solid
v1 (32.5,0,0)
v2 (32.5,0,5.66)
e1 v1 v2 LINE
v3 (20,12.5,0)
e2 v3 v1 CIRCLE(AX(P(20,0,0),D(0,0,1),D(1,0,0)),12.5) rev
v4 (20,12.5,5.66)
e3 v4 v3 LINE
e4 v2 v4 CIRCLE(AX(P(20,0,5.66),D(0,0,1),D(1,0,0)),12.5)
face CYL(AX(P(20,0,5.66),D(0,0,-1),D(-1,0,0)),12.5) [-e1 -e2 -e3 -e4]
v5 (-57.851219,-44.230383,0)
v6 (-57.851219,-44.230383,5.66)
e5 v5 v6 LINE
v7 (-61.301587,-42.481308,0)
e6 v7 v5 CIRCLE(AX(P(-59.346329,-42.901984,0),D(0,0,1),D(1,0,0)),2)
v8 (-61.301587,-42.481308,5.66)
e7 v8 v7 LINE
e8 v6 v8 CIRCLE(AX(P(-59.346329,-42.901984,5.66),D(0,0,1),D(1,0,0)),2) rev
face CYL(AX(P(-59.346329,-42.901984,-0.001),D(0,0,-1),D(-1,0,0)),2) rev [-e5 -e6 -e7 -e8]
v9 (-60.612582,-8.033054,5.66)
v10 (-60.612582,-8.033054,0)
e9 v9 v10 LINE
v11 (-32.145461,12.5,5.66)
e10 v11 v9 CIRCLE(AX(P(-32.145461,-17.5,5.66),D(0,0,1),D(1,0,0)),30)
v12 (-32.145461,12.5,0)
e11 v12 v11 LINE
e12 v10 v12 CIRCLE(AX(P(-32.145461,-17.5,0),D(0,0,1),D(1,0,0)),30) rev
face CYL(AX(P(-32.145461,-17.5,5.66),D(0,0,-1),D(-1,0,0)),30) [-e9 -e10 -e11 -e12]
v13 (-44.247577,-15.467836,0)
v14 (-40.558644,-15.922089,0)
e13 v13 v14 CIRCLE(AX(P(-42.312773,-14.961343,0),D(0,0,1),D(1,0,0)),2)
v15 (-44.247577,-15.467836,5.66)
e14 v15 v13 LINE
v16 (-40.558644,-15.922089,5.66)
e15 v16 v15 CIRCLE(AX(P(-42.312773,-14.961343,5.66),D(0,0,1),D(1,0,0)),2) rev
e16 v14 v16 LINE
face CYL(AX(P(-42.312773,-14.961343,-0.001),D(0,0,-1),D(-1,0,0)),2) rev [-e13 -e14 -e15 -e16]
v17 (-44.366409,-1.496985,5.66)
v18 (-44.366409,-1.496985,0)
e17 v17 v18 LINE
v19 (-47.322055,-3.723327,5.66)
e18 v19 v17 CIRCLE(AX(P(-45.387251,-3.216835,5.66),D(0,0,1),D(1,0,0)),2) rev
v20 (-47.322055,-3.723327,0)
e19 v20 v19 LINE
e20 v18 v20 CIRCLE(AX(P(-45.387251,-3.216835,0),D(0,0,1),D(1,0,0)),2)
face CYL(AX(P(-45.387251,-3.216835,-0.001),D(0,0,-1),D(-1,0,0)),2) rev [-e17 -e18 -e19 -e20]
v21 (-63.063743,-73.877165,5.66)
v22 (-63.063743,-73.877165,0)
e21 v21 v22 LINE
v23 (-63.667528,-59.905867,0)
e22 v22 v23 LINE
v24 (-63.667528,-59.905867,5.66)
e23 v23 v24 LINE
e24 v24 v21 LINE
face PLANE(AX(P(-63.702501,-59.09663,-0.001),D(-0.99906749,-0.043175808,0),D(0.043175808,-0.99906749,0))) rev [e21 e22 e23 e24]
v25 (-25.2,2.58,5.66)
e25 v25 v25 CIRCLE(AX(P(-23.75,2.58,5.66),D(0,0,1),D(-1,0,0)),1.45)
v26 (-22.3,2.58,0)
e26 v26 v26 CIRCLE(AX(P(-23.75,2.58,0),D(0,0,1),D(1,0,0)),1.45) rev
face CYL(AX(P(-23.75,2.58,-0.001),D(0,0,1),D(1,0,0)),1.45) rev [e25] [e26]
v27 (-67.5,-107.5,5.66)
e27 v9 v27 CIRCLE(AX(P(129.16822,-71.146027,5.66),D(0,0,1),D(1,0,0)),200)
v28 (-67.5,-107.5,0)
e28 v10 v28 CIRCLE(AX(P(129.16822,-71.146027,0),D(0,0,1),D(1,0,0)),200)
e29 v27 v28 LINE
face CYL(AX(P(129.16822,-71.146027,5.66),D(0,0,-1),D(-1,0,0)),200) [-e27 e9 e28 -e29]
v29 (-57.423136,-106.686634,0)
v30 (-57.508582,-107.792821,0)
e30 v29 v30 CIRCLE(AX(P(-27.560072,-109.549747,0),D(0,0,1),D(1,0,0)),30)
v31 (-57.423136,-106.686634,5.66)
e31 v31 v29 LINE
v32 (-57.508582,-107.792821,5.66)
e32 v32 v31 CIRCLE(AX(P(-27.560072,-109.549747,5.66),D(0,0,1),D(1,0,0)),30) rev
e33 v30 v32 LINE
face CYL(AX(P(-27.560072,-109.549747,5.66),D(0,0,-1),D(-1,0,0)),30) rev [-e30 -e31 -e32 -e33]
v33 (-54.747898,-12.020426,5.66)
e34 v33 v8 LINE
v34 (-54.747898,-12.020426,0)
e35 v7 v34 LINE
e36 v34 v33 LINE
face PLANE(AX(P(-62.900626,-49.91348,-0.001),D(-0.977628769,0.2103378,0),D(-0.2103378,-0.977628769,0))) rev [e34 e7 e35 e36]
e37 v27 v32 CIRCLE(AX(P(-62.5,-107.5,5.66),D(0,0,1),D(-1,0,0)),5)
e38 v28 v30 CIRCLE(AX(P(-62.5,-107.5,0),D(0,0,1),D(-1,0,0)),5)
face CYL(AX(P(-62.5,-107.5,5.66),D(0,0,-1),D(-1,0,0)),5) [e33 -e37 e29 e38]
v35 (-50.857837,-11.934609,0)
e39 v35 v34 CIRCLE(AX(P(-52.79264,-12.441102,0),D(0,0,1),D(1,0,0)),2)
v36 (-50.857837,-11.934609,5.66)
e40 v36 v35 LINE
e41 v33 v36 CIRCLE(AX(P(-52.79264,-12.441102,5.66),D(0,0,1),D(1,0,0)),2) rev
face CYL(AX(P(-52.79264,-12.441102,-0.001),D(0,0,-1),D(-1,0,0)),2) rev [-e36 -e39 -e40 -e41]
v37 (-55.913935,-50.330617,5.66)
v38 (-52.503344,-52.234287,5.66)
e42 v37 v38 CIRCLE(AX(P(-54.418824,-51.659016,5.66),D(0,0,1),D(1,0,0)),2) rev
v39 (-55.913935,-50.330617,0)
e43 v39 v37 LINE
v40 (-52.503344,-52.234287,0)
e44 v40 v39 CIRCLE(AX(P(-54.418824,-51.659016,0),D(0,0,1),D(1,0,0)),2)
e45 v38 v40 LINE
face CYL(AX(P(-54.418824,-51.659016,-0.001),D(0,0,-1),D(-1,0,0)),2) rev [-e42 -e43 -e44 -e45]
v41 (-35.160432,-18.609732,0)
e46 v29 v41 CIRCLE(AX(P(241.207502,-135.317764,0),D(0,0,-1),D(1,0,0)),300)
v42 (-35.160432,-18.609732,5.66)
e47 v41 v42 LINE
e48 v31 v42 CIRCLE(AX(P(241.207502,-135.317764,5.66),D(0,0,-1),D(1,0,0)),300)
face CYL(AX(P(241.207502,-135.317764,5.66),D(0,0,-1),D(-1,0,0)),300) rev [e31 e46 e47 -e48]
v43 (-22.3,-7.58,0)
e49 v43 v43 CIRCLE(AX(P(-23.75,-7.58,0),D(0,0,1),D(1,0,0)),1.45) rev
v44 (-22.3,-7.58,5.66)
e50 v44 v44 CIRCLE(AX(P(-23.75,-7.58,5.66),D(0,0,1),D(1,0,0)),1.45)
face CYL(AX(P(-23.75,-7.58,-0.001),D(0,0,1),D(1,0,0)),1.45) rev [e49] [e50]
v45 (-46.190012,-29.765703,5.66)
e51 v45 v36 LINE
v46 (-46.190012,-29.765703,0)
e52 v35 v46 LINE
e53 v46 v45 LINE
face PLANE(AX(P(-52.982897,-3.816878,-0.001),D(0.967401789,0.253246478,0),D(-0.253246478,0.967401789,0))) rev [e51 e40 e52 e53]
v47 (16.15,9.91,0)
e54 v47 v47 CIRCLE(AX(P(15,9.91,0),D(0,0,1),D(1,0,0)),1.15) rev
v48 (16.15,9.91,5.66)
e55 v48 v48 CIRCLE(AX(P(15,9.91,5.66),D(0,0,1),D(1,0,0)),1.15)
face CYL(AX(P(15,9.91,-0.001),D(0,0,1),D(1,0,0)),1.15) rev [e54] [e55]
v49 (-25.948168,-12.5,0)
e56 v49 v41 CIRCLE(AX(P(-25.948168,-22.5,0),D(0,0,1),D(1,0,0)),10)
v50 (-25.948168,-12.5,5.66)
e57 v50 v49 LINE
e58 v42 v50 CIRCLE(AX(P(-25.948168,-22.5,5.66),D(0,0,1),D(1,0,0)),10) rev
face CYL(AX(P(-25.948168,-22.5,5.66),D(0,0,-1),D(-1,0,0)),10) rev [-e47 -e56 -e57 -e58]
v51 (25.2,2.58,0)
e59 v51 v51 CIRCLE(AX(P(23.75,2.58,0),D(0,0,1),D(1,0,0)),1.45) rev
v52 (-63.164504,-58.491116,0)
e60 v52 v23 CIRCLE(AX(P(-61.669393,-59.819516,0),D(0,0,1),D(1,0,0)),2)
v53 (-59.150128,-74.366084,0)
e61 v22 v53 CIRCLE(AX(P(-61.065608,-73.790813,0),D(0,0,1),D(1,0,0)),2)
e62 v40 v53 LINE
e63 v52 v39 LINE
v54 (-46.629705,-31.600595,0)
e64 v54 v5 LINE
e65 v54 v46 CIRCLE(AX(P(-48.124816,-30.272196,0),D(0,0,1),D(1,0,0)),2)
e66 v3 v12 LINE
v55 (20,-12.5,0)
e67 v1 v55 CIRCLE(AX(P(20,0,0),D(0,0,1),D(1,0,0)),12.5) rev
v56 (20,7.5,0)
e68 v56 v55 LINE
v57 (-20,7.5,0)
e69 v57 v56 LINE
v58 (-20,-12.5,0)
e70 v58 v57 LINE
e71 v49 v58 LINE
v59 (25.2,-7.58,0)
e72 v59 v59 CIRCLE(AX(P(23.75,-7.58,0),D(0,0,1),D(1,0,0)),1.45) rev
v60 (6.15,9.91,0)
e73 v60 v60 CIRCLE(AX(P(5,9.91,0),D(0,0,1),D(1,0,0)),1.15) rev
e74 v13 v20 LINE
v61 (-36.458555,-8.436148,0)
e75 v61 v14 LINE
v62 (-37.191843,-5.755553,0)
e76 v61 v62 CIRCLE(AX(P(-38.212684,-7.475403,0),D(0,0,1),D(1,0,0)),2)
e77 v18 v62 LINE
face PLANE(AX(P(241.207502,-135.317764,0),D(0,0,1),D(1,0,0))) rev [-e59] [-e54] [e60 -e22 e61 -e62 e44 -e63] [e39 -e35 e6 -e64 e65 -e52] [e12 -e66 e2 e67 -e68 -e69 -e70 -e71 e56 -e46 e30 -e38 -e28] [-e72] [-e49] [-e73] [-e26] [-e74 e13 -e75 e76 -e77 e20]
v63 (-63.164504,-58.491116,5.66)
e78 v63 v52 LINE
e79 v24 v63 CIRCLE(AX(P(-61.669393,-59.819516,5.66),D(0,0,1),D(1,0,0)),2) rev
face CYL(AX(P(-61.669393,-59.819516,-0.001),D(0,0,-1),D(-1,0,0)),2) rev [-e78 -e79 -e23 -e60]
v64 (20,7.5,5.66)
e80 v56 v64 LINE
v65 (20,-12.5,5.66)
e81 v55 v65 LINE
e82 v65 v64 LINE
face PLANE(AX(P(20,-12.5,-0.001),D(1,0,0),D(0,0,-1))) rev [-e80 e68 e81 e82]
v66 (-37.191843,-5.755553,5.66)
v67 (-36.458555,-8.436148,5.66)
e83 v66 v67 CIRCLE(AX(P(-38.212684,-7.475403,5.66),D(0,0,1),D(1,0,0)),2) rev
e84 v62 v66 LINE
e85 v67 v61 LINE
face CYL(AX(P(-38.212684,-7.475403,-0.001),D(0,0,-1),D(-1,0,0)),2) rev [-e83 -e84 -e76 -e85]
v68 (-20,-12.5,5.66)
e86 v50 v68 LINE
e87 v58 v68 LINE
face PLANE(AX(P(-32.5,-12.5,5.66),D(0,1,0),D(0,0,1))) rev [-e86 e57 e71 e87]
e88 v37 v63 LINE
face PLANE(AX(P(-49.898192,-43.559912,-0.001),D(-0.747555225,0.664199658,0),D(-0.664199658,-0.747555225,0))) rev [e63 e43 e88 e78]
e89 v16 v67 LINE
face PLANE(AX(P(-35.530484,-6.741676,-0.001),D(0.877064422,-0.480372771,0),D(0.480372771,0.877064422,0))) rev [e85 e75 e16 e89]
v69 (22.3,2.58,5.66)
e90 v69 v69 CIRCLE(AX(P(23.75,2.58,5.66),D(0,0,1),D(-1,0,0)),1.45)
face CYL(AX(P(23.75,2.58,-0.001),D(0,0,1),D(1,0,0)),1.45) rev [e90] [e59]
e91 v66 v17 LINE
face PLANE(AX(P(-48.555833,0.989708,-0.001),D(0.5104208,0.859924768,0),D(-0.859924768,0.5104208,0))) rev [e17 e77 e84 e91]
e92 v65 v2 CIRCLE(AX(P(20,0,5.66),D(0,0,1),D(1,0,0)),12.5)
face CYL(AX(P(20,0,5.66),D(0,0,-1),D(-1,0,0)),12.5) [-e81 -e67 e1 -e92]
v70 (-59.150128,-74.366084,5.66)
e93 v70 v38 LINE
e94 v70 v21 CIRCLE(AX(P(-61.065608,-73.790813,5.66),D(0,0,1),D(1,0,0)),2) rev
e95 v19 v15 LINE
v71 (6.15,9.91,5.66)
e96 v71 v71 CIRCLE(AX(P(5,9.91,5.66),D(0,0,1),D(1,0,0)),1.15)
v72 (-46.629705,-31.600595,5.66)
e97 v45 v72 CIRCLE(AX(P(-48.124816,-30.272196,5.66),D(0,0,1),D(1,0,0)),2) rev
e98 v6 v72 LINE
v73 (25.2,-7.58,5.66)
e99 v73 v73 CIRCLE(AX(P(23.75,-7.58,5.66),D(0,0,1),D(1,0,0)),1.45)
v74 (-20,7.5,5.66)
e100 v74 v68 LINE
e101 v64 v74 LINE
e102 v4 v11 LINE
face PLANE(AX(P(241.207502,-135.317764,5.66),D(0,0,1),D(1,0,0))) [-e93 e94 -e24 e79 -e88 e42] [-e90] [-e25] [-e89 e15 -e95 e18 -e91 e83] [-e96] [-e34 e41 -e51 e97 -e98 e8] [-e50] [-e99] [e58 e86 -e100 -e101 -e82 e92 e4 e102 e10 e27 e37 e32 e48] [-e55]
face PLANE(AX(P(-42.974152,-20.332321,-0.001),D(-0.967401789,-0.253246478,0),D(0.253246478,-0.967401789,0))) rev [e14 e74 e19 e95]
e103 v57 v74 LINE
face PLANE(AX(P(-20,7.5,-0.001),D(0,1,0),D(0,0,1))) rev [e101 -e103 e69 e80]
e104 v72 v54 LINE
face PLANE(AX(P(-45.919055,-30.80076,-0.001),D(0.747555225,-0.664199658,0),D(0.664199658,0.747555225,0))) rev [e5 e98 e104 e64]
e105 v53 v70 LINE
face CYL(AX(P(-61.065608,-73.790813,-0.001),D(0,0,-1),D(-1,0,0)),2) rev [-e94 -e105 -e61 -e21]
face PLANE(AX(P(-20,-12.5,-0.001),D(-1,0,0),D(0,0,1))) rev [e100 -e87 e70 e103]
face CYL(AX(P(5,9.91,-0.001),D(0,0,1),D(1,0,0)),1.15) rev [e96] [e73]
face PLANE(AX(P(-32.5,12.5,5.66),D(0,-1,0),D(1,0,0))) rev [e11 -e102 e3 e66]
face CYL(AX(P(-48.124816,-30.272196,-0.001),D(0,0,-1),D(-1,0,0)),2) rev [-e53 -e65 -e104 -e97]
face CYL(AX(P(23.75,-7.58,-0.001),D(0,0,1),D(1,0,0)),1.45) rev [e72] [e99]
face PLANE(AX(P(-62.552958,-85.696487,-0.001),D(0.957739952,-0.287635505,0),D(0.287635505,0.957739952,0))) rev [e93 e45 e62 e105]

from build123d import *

# Parameters (mm, degrees)
BOSS_EXTRU_1_DEPTH      = 5.66
ENL_V_MAT_EXTRU_1_REACH = 135.062
ESQUISSE2_W             = 40
ESQUISSE2_H             = 20
ENL_V_MAT_EXTRU_2_REACH = 135.062
ESQUISSE3_R             = 1.45
CONG_2_R                = 12.5
CONG_3_R                = 10
CONG_4_R                = 30
CONG_5_R                = 30
ENL_V_MAT_EXTRU_3_REACH = 135.062
CONG_6_R                = 2
ENL_V_MAT_EXTRU_4_REACH = 135.062
ESQUISSE5_R             = 1.15


# Some blends are built 0.0001 mm under size
with BuildPart() as part:
    # Esquisse1 → Boss.-Extru.1 (new body)
    with BuildSketch(Plane.XY):
        with BuildLine():
            Line((-32.5, 12.5), (-52.5, 12.5))
            ThreePointArc((-52.5, 12.5), (-69.287355537, -46.339080558), (-67.5, -107.5))
            ThreePointArc((-67.5, -107.5), (-62.5, -112.5), (-57.5, -107.5))
            ThreePointArc((-57.5, -107.5), (-48.914858734, -58.969774017), (-32.5, -12.5))
            Line((-32.5, -12.5), (32.5, -12.5))
            Line((32.5, -12.5), (32.5, 12.5))
            Line((32.5, 12.5), (-32.5, 12.5))
        make_face()
    extrude(amount=BOSS_EXTRU_1_DEPTH)

    # Esquisse2 → Enlèv. mat.-Extru.1 (cut, up to next)
    with BuildSketch(Plane.XY.offset(5.66), mode=Mode.PRIVATE) as enl_v_mat_extru_1_sk1:
        with Locations((0, -2.5)):
            Rectangle(ESQUISSE2_W, ESQUISSE2_H)
    enl_v_mat_extru_1_tool1 = extrude(enl_v_mat_extru_1_sk1.sketch, amount=-ENL_V_MAT_EXTRU_1_REACH, mode=Mode.PRIVATE) & part.part
    add(enl_v_mat_extru_1_tool1.solids().sort_by_distance((0, -2.5, 5.66))[0], mode=Mode.SUBTRACT)

    # Esquisse3 → Enlèv. mat.-Extru.2 (cut, up to next)
    with BuildSketch(Plane.XY.offset(5.66), mode=Mode.PRIVATE) as enl_v_mat_extru_2_sk1:
        with Locations((-23.75, -7.58)):
            Circle(ESQUISSE3_R)
    enl_v_mat_extru_2_tool1 = extrude(enl_v_mat_extru_2_sk1.sketch, amount=-ENL_V_MAT_EXTRU_2_REACH, mode=Mode.PRIVATE) & part.part
    # Esquisse3 → Enlèv. mat.-Extru.2 (cut, up to next)
    with BuildSketch(Plane.XY.offset(5.66), mode=Mode.PRIVATE) as enl_v_mat_extru_2_sk2:
        with Locations((23.75, -7.58)):
            Circle(ESQUISSE3_R)
    enl_v_mat_extru_2_tool2 = extrude(enl_v_mat_extru_2_sk2.sketch, amount=-ENL_V_MAT_EXTRU_2_REACH, mode=Mode.PRIVATE) & part.part
    # Esquisse3 → Enlèv. mat.-Extru.2 (cut, up to next)
    with BuildSketch(Plane.XY.offset(5.66), mode=Mode.PRIVATE) as enl_v_mat_extru_2_sk3:
        with Locations((23.75, 2.58)):
            Circle(ESQUISSE3_R)
    enl_v_mat_extru_2_tool3 = extrude(enl_v_mat_extru_2_sk3.sketch, amount=-ENL_V_MAT_EXTRU_2_REACH, mode=Mode.PRIVATE) & part.part
    # Esquisse3 → Enlèv. mat.-Extru.2 (cut, up to next)
    with BuildSketch(Plane.XY.offset(5.66), mode=Mode.PRIVATE) as enl_v_mat_extru_2_sk4:
        with Locations((-23.75, 2.58)):
            Circle(ESQUISSE3_R)
    enl_v_mat_extru_2_tool4 = extrude(enl_v_mat_extru_2_sk4.sketch, amount=-ENL_V_MAT_EXTRU_2_REACH, mode=Mode.PRIVATE) & part.part
    add(enl_v_mat_extru_2_tool1.solids().sort_by_distance((-23.75, -7.58, 5.66))[0], mode=Mode.SUBTRACT)
    add(enl_v_mat_extru_2_tool2.solids().sort_by_distance((23.75, -7.58, 5.66))[0], mode=Mode.SUBTRACT)
    add(enl_v_mat_extru_2_tool3.solids().sort_by_distance((23.75, 2.58, 5.66))[0], mode=Mode.SUBTRACT)
    add(enl_v_mat_extru_2_tool4.solids().sort_by_distance((-23.75, 2.58, 5.66))[0], mode=Mode.SUBTRACT)

    # Congé2
    cong_2_edges = [part.edges().sort_by_distance(p)[0] for p in [
        (32.5, -12.5, 2.83),
        (32.5, 12.5, 2.83),
    ]]
    fillet(cong_2_edges, radius=CONG_2_R - 0.0001)  # a hair under: the kernel refuses the full size

    # Congé3
    cong_3_edges = [part.edges().sort_by_distance(p)[0] for p in [
        (-32.5, -12.5, 2.83),
    ]]
    fillet(cong_3_edges, radius=CONG_3_R)

    # Congé4
    cong_4_edges = [part.edges().sort_by_distance(p)[0] for p in [
        (-52.5, 12.5, 2.83),
    ]]
    fillet(cong_4_edges, radius=CONG_4_R)

    # Congé5
    # the kernel refuses this fillet: 30 mm, written as the material it adds along each edge
    with BuildSketch(Plane(origin=(-57.5, -107.5, 0), x_dir=(-0.029294676062998543, -0.9995708188789647, 0), z_dir=(0, 0, 1))) as cong_5_piece_1:
        with BuildLine():
            CenterArc((1.171787043, 29.987124566), CONG_5_R, 266.202223448, 2.119075089)
            ThreePointArc((-0.815268333, 0.053003384), (-0.407652209, 0.026224165), (0, 0))
            ThreePointArc((0, 0), (0.14647338, 0.002145906), (0.292946761, 0))
        make_face()
    extrude(amount=5.66)

    # Esquisse4 → Enlèv. mat.-Extru.3 (cut, up to next)
    with BuildSketch(Plane.XY.offset(5.66), mode=Mode.PRIVATE) as enl_v_mat_extru_3_sk1:
        Polygon((-35.530484253, -6.741676359), (-42.974151572, -20.332321303), (-48.555833289, 0.989708193), align=None)
    enl_v_mat_extru_3_tool1 = extrude(enl_v_mat_extru_3_sk1.sketch, amount=-ENL_V_MAT_EXTRU_3_REACH, mode=Mode.PRIVATE) & part.part
    # Esquisse4 → Enlèv. mat.-Extru.3 (cut, up to next)
    with BuildSketch(Plane.XY.offset(5.66), mode=Mode.PRIVATE) as enl_v_mat_extru_3_sk2:
        Polygon((-52.982896502, -3.816878406), (-45.919055028, -30.800759586), (-62.900626013, -49.913479621), align=None)
    enl_v_mat_extru_3_tool2 = extrude(enl_v_mat_extru_3_sk2.sketch, amount=-ENL_V_MAT_EXTRU_3_REACH, mode=Mode.PRIVATE) & part.part
    # Esquisse4 → Enlèv. mat.-Extru.3 (cut, up to next)
    with BuildSketch(Plane.XY.offset(5.66), mode=Mode.PRIVATE) as enl_v_mat_extru_3_sk3:
        Polygon((-49.898192375, -43.559912364), (-63.702500518, -59.0966302), (-62.552958266, -85.696486809), align=None)
    enl_v_mat_extru_3_tool3 = extrude(enl_v_mat_extru_3_sk3.sketch, amount=-ENL_V_MAT_EXTRU_3_REACH, mode=Mode.PRIVATE) & part.part
    add(enl_v_mat_extru_3_tool1.solids().sort_by_distance((-42.35349, -8.694763, 5.66))[0], mode=Mode.SUBTRACT)
    add(enl_v_mat_extru_3_tool2.solids().sort_by_distance((-53.934193, -28.177039, 5.66))[0], mode=Mode.SUBTRACT)
    add(enl_v_mat_extru_3_tool3.solids().sort_by_distance((-58.717884, -62.784343, 5.66))[0], mode=Mode.SUBTRACT)

    # Congé6
    cong_6_edges = [part.edges().sort_by_distance(p)[0] for p in [
        (-62.900626013, -49.913479621, 2.83),
        (-52.982896502, -3.816878406, 2.83),
        (-45.919055028, -30.800759586, 2.83),
        (-49.898192375, -43.559912364, 2.83),
        (-62.552958266, -85.696486809, 2.83),
        (-63.702500518, -59.0966302, 2.83),
        (-48.555833289, 0.989708193, 2.83),
        (-35.530484253, -6.741676359, 2.83),
        (-42.974151572, -20.332321303, 2.83),
    ]]
    fillet(cong_6_edges, radius=CONG_6_R)

    # Esquisse5 → Enlèv. mat.-Extru.4 (cut, up to next)
    with BuildSketch(Plane.XY.offset(5.66), mode=Mode.PRIVATE) as enl_v_mat_extru_4_sk1:
        with Locations((15, 9.91)):
            Circle(ESQUISSE5_R)
    enl_v_mat_extru_4_tool1 = extrude(enl_v_mat_extru_4_sk1.sketch, amount=-ENL_V_MAT_EXTRU_4_REACH, mode=Mode.PRIVATE) & part.part
    # Esquisse5 → Enlèv. mat.-Extru.4 (cut, up to next)
    with BuildSketch(Plane.XY.offset(5.66), mode=Mode.PRIVATE) as enl_v_mat_extru_4_sk2:
        with Locations((5, 9.91)):
            Circle(ESQUISSE5_R)
    enl_v_mat_extru_4_tool2 = extrude(enl_v_mat_extru_4_sk2.sketch, amount=-ENL_V_MAT_EXTRU_4_REACH, mode=Mode.PRIVATE) & part.part
    add(enl_v_mat_extru_4_tool1.solids().sort_by_distance((15, 9.91, 5.66))[0], mode=Mode.SUBTRACT)
    add(enl_v_mat_extru_4_tool2.solids().sort_by_distance((5, 9.91, 5.66))[0], mode=Mode.SUBTRACT)


solid = part.part
